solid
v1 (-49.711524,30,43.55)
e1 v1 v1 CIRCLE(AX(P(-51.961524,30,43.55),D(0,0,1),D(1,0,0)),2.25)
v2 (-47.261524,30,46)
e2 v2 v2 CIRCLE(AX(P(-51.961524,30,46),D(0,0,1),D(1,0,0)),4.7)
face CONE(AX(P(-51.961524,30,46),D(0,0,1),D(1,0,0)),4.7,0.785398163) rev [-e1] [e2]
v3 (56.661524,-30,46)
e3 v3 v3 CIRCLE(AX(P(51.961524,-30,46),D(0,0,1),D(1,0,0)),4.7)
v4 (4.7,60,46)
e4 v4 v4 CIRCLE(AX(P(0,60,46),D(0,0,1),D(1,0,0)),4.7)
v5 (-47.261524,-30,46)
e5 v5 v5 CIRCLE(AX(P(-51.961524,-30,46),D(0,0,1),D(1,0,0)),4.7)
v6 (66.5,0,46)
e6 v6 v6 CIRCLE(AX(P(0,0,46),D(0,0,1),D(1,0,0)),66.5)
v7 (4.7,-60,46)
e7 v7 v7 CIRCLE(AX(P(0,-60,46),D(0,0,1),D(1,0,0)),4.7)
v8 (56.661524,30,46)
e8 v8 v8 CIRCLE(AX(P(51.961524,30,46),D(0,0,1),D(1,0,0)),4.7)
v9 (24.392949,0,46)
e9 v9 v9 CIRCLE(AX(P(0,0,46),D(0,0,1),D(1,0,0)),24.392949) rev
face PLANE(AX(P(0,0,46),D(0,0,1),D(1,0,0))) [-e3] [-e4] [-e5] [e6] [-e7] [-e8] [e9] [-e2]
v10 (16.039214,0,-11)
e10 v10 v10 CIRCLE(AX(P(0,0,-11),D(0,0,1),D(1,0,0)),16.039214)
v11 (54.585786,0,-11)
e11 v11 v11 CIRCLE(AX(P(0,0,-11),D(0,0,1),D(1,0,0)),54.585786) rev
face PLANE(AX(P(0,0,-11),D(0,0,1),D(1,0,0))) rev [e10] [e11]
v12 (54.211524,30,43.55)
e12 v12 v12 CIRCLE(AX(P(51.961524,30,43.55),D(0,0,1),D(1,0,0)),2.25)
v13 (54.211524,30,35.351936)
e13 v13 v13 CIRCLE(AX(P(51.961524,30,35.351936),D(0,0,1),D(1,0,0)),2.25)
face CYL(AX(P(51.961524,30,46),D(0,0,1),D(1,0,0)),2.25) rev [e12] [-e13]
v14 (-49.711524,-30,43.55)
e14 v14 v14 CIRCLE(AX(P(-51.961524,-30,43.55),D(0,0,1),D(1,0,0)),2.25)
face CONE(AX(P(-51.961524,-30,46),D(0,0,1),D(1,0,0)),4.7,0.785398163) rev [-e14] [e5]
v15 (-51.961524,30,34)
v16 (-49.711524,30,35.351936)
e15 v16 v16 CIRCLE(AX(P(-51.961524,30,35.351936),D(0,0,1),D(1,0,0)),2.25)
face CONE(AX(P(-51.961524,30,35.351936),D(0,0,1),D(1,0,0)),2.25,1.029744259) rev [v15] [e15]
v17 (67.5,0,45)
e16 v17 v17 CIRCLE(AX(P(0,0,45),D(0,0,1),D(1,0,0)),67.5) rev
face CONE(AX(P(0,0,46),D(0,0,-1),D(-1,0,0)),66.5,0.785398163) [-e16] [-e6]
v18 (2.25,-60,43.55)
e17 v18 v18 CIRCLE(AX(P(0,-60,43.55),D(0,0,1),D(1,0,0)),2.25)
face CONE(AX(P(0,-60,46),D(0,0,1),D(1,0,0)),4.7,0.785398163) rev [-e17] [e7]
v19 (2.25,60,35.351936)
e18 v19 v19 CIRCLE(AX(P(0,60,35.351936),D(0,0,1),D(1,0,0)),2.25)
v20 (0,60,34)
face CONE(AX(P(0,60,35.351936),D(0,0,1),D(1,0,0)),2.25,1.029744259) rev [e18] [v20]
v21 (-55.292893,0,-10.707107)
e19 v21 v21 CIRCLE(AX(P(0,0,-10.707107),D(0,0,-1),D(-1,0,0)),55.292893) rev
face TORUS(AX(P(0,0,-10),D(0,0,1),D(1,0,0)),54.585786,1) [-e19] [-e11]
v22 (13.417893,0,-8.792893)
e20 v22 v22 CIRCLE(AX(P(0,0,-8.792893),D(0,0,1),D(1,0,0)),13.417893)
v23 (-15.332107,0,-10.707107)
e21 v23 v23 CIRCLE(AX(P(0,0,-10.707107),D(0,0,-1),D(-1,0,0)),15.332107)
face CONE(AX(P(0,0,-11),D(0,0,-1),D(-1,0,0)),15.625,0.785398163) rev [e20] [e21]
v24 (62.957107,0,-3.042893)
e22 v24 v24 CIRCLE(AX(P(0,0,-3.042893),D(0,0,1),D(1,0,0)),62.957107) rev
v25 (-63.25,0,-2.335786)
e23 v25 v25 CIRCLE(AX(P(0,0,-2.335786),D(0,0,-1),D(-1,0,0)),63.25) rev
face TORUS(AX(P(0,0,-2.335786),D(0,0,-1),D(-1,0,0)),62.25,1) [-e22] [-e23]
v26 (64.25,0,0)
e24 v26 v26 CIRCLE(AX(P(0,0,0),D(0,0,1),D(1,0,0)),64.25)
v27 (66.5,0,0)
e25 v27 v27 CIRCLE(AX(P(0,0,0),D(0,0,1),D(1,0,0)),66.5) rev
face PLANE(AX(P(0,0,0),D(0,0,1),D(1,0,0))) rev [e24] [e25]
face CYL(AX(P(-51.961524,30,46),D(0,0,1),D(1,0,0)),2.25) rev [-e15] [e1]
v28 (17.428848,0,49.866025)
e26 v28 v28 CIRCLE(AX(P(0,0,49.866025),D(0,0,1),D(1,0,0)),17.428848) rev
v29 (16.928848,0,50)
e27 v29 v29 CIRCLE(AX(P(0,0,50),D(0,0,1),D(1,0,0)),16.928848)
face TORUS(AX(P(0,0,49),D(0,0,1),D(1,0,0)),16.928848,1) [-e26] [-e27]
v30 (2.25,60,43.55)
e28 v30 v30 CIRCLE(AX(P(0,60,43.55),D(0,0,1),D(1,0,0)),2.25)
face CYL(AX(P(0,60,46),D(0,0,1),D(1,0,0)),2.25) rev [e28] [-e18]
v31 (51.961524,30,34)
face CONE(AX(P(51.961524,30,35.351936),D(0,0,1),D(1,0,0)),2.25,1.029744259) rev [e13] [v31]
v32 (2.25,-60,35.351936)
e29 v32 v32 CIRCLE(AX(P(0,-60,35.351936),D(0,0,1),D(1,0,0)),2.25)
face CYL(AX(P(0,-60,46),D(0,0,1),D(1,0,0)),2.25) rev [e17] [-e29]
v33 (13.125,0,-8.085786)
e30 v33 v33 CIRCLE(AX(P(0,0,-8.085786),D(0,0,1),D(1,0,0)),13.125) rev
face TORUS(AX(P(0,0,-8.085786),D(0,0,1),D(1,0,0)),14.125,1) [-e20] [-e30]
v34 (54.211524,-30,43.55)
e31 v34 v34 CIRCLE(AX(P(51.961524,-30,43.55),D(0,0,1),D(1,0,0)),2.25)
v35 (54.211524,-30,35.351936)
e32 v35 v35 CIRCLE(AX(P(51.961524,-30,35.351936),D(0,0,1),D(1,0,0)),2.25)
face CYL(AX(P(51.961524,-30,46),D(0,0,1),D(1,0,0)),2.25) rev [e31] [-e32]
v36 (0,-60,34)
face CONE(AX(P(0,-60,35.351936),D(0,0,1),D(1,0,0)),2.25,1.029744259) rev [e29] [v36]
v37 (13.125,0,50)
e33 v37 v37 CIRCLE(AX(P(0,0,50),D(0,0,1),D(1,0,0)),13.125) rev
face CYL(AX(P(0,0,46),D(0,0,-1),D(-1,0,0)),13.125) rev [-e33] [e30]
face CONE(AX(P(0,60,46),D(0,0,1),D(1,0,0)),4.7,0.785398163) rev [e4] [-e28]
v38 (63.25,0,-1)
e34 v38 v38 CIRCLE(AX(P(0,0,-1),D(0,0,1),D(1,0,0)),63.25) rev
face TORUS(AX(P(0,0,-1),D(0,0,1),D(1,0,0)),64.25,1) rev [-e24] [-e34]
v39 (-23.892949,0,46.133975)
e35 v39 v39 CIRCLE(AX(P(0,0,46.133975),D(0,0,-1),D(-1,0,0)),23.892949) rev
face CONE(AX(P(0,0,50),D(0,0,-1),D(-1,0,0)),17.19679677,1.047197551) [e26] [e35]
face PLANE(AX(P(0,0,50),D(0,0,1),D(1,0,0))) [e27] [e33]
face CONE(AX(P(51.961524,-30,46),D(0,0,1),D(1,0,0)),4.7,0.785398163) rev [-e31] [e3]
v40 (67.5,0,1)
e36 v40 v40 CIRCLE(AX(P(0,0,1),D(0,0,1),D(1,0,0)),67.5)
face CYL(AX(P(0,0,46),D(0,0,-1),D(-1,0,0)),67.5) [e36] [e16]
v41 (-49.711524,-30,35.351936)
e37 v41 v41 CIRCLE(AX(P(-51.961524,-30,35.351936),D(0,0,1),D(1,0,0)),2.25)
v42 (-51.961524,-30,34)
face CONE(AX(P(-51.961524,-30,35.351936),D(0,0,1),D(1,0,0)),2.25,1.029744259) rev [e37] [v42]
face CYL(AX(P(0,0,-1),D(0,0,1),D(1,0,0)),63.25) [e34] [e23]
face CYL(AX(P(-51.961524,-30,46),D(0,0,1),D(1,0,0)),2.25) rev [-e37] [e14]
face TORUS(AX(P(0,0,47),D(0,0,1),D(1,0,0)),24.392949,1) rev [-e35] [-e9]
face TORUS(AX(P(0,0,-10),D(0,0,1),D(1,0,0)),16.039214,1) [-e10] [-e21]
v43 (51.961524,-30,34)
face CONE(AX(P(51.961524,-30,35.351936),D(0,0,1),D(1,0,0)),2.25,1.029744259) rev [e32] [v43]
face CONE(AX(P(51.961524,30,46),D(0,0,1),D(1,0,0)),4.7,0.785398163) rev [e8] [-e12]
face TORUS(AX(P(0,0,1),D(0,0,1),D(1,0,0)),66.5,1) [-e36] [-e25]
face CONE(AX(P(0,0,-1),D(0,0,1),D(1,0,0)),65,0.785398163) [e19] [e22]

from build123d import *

# Parameters (mm, degrees)
SKETCH1_R           = 67.5
SKETCH1_R_2         = 13.125
SKETCH1_R_3         = 63.25
SKETCH1_R_4         = 55
BOSS_EXTRUDE1_DEPTH = 46
BOSS_EXTRUDE4_START = -11
SKETCH1_3_R         = 55
SKETCH1_3_R_2       = 13.125
BOSS_EXTRUDE4_DEPTH = 11
CIRPATTERN1_COUNT   = 6
CHAMFER1_SIZE       = 1
BOSS_EXTRUDE5_START = -1
SKETCH1_4_R         = 63.25
SKETCH1_4_R_2       = 55
BOSS_EXTRUDE5_DEPTH = 1
CHAMFER5_SIZE       = 10
CHAMFER6_SIZE       = 2.5
FILLET6_R           = 1
SKETCH6_R           = 24.125
SKETCH6_R_2         = 13.125
BOSS_EXTRUDE6_DEPTH = 4
CHAMFER7_SIZE2      = 4
CHAMFER7_SIZE       = 6.92820323


with BuildPart() as part:
    # Sketch1 → Boss-Extrude1 (new body)
    # profile 1 of 3: a face of its own
    with BuildSketch(Plane.XY):
        Circle(SKETCH1_R)
        Circle(SKETCH1_R_2, mode=Mode.SUBTRACT)
    # profile 2 of 3: a face of its own
    with BuildSketch(Plane.XY):
        Circle(SKETCH1_R_3)
        Circle(SKETCH1_R_2, mode=Mode.SUBTRACT)
    # profile 3 of 3: a face of its own
    with BuildSketch(Plane.XY):
        Circle(SKETCH1_R_4)
        Circle(SKETCH1_R_2, mode=Mode.SUBTRACT)
    extrude(amount=BOSS_EXTRUDE1_DEPTH)

    # Sketch1<3> → Boss-Extrude4 (add)
    with BuildSketch(Plane.XY.offset(BOSS_EXTRUDE4_START)):
        Circle(SKETCH1_3_R)
        Circle(SKETCH1_3_R_2, mode=Mode.SUBTRACT)
    extrude(amount=BOSS_EXTRUDE4_DEPTH)

    # Sketch4 → CSK for M4 Flat Head Machine Screw1 (revolve, cut)
    with BuildSketch(Plane(origin=(0, 60, 46), x_dir=(0, -1, 0), z_dir=(1, 0, 0))):
        Polygon((0, 0), (0, 12), (2.25, 10.648063607), (2.25, 2.45), (4.7, 0), align=None)
    csk_for_m4_flat_head_machine_screw1 = revolve(axis=Axis((0, 60, 52.35), (0, 0, -1)), mode=Mode.SUBTRACT)

    # CirPattern1: CSK for M4 Flat Head Machine Screw1 ×6 about axis
    cirpattern1_axis = Axis((0, 0, 0), (0, 0, 1))
    for i in range(1, CIRPATTERN1_COUNT):
        add(csk_for_m4_flat_head_machine_screw1.rotate(cirpattern1_axis, i * 360 / CIRPATTERN1_COUNT), mode=Mode.SUBTRACT)

    # Chamfer1
    chamfer1_edges = [part.edges().sort_by_distance(p)[0] for p in [
        (-67.5, 0, 46),
    ]]
    chamfer(chamfer1_edges, length=CHAMFER1_SIZE)

    # Sketch1<4> → Boss-Extrude5 (add)
    with BuildSketch(Plane.XY.offset(BOSS_EXTRUDE5_START)):
        Circle(SKETCH1_4_R)
        Circle(SKETCH1_4_R_2, mode=Mode.SUBTRACT)
    extrude(amount=BOSS_EXTRUDE5_DEPTH)

    # Chamfer5
    # the kernel refuses this chamfer: 10 mm, written as the material it adds along each edge
    with BuildSketch(Plane(origin=(0, 0, -1), x_dir=(1, 0, 0), z_dir=(0, -1, 0))) as chamfer5_piece_1_section:
        Polygon((55 + CHAMFER5_SIZE, 0), (55, -CHAMFER5_SIZE), (55, 0), align=None)
    chamfer5_piece_1 = revolve(axis=Axis((0, 0, -1), (0, 0, 1)), mode=Mode.PRIVATE)
    chamfer5_piece_1 = chamfer5_piece_1 & Plane(origin=(0, 0, -1), x_dir=(1, 0, 0), z_dir=(0, 0, -1)) * Cylinder(63.25, 260, mode=Mode.PRIVATE)
    chamfer5_piece_1 = split(chamfer5_piece_1, bisect_by=Plane(origin=(0, 0, -11), z_dir=(0, 0, 1)), keep=Keep.TOP, mode=Mode.PRIVATE)
    add(chamfer5_piece_1)

    # Chamfer6
    chamfer6_edges = [part.edges().sort_by_distance(p)[0] for p in [
        (-13.125, 0, -11),
    ]]
    chamfer(chamfer6_edges, length=CHAMFER6_SIZE)

    # Fillet6
    fillet6_edges = [part.edges().sort_by_distance(p)[0] for p in [
        (-55, 0, -11),
        (-67.5, 0, 0),
        (-63.25, 0, 0),
        (-63.25, 0, -2.75),
        (-15.625, 0, -11),
        (-13.125, 0, -8.5),
    ]]
    fillet(fillet6_edges, radius=FILLET6_R)

    # Sketch6 → Boss-Extrude6 (add)
    with BuildSketch(Plane.XY.offset(46)):
        Circle(SKETCH6_R)
        Circle(SKETCH6_R_2, mode=Mode.SUBTRACT)
    extrude(amount=BOSS_EXTRUDE6_DEPTH)

    # Chamfer7
    chamfer7_edges = [part.edges().sort_by_distance(p)[0] for p in [
        (-24.125, 0, 50),
    ]]
    chamfer7_side = [part.faces().sort_by_distance(p)[0] for p in [
        (-24.045, 0, 50),
    ]]
    chamfer(chamfer7_edges, length=CHAMFER7_SIZE - 0.0001, length2=CHAMFER7_SIZE2 - 0.0001, reference=chamfer7_side[0])  # a hair under: the kernel refuses the full size

    # Fillet8: read off the stored shape, not the designer's step
    # Fillet8 outline → Fillet8 (revolve, cut)
    with BuildSketch(Plane.XZ):
        with BuildLine():
            ThreePointArc((16.928847577, 50), (17.187666622, 49.965925826), (17.428847577, 49.866025404))
            Line((17.428847577, 49.866025404), (17.428847577, 50))
            Line((17.428847577, 50), (16.928847577, 50))
        make_face()
    revolve(axis=Axis((0, 0, 0), (0, 0, 1)), mode=Mode.SUBTRACT)

    # Fillet8 2 outline → Fillet8 2 (revolve)
    with BuildSketch(Plane.XZ):
        with BuildLine():
            ThreePointArc((24.392949192, 46), (24.134130147, 46.034074174), (23.892949192, 46.133974596))
            Line((23.892949192, 46.133974596), (23.892949192, 46))
            Line((23.892949192, 46), (24.392949192, 46))
        make_face()
    revolve(axis=Axis((0, 0, 0), (0, 0, 1)))


solid = part.part
